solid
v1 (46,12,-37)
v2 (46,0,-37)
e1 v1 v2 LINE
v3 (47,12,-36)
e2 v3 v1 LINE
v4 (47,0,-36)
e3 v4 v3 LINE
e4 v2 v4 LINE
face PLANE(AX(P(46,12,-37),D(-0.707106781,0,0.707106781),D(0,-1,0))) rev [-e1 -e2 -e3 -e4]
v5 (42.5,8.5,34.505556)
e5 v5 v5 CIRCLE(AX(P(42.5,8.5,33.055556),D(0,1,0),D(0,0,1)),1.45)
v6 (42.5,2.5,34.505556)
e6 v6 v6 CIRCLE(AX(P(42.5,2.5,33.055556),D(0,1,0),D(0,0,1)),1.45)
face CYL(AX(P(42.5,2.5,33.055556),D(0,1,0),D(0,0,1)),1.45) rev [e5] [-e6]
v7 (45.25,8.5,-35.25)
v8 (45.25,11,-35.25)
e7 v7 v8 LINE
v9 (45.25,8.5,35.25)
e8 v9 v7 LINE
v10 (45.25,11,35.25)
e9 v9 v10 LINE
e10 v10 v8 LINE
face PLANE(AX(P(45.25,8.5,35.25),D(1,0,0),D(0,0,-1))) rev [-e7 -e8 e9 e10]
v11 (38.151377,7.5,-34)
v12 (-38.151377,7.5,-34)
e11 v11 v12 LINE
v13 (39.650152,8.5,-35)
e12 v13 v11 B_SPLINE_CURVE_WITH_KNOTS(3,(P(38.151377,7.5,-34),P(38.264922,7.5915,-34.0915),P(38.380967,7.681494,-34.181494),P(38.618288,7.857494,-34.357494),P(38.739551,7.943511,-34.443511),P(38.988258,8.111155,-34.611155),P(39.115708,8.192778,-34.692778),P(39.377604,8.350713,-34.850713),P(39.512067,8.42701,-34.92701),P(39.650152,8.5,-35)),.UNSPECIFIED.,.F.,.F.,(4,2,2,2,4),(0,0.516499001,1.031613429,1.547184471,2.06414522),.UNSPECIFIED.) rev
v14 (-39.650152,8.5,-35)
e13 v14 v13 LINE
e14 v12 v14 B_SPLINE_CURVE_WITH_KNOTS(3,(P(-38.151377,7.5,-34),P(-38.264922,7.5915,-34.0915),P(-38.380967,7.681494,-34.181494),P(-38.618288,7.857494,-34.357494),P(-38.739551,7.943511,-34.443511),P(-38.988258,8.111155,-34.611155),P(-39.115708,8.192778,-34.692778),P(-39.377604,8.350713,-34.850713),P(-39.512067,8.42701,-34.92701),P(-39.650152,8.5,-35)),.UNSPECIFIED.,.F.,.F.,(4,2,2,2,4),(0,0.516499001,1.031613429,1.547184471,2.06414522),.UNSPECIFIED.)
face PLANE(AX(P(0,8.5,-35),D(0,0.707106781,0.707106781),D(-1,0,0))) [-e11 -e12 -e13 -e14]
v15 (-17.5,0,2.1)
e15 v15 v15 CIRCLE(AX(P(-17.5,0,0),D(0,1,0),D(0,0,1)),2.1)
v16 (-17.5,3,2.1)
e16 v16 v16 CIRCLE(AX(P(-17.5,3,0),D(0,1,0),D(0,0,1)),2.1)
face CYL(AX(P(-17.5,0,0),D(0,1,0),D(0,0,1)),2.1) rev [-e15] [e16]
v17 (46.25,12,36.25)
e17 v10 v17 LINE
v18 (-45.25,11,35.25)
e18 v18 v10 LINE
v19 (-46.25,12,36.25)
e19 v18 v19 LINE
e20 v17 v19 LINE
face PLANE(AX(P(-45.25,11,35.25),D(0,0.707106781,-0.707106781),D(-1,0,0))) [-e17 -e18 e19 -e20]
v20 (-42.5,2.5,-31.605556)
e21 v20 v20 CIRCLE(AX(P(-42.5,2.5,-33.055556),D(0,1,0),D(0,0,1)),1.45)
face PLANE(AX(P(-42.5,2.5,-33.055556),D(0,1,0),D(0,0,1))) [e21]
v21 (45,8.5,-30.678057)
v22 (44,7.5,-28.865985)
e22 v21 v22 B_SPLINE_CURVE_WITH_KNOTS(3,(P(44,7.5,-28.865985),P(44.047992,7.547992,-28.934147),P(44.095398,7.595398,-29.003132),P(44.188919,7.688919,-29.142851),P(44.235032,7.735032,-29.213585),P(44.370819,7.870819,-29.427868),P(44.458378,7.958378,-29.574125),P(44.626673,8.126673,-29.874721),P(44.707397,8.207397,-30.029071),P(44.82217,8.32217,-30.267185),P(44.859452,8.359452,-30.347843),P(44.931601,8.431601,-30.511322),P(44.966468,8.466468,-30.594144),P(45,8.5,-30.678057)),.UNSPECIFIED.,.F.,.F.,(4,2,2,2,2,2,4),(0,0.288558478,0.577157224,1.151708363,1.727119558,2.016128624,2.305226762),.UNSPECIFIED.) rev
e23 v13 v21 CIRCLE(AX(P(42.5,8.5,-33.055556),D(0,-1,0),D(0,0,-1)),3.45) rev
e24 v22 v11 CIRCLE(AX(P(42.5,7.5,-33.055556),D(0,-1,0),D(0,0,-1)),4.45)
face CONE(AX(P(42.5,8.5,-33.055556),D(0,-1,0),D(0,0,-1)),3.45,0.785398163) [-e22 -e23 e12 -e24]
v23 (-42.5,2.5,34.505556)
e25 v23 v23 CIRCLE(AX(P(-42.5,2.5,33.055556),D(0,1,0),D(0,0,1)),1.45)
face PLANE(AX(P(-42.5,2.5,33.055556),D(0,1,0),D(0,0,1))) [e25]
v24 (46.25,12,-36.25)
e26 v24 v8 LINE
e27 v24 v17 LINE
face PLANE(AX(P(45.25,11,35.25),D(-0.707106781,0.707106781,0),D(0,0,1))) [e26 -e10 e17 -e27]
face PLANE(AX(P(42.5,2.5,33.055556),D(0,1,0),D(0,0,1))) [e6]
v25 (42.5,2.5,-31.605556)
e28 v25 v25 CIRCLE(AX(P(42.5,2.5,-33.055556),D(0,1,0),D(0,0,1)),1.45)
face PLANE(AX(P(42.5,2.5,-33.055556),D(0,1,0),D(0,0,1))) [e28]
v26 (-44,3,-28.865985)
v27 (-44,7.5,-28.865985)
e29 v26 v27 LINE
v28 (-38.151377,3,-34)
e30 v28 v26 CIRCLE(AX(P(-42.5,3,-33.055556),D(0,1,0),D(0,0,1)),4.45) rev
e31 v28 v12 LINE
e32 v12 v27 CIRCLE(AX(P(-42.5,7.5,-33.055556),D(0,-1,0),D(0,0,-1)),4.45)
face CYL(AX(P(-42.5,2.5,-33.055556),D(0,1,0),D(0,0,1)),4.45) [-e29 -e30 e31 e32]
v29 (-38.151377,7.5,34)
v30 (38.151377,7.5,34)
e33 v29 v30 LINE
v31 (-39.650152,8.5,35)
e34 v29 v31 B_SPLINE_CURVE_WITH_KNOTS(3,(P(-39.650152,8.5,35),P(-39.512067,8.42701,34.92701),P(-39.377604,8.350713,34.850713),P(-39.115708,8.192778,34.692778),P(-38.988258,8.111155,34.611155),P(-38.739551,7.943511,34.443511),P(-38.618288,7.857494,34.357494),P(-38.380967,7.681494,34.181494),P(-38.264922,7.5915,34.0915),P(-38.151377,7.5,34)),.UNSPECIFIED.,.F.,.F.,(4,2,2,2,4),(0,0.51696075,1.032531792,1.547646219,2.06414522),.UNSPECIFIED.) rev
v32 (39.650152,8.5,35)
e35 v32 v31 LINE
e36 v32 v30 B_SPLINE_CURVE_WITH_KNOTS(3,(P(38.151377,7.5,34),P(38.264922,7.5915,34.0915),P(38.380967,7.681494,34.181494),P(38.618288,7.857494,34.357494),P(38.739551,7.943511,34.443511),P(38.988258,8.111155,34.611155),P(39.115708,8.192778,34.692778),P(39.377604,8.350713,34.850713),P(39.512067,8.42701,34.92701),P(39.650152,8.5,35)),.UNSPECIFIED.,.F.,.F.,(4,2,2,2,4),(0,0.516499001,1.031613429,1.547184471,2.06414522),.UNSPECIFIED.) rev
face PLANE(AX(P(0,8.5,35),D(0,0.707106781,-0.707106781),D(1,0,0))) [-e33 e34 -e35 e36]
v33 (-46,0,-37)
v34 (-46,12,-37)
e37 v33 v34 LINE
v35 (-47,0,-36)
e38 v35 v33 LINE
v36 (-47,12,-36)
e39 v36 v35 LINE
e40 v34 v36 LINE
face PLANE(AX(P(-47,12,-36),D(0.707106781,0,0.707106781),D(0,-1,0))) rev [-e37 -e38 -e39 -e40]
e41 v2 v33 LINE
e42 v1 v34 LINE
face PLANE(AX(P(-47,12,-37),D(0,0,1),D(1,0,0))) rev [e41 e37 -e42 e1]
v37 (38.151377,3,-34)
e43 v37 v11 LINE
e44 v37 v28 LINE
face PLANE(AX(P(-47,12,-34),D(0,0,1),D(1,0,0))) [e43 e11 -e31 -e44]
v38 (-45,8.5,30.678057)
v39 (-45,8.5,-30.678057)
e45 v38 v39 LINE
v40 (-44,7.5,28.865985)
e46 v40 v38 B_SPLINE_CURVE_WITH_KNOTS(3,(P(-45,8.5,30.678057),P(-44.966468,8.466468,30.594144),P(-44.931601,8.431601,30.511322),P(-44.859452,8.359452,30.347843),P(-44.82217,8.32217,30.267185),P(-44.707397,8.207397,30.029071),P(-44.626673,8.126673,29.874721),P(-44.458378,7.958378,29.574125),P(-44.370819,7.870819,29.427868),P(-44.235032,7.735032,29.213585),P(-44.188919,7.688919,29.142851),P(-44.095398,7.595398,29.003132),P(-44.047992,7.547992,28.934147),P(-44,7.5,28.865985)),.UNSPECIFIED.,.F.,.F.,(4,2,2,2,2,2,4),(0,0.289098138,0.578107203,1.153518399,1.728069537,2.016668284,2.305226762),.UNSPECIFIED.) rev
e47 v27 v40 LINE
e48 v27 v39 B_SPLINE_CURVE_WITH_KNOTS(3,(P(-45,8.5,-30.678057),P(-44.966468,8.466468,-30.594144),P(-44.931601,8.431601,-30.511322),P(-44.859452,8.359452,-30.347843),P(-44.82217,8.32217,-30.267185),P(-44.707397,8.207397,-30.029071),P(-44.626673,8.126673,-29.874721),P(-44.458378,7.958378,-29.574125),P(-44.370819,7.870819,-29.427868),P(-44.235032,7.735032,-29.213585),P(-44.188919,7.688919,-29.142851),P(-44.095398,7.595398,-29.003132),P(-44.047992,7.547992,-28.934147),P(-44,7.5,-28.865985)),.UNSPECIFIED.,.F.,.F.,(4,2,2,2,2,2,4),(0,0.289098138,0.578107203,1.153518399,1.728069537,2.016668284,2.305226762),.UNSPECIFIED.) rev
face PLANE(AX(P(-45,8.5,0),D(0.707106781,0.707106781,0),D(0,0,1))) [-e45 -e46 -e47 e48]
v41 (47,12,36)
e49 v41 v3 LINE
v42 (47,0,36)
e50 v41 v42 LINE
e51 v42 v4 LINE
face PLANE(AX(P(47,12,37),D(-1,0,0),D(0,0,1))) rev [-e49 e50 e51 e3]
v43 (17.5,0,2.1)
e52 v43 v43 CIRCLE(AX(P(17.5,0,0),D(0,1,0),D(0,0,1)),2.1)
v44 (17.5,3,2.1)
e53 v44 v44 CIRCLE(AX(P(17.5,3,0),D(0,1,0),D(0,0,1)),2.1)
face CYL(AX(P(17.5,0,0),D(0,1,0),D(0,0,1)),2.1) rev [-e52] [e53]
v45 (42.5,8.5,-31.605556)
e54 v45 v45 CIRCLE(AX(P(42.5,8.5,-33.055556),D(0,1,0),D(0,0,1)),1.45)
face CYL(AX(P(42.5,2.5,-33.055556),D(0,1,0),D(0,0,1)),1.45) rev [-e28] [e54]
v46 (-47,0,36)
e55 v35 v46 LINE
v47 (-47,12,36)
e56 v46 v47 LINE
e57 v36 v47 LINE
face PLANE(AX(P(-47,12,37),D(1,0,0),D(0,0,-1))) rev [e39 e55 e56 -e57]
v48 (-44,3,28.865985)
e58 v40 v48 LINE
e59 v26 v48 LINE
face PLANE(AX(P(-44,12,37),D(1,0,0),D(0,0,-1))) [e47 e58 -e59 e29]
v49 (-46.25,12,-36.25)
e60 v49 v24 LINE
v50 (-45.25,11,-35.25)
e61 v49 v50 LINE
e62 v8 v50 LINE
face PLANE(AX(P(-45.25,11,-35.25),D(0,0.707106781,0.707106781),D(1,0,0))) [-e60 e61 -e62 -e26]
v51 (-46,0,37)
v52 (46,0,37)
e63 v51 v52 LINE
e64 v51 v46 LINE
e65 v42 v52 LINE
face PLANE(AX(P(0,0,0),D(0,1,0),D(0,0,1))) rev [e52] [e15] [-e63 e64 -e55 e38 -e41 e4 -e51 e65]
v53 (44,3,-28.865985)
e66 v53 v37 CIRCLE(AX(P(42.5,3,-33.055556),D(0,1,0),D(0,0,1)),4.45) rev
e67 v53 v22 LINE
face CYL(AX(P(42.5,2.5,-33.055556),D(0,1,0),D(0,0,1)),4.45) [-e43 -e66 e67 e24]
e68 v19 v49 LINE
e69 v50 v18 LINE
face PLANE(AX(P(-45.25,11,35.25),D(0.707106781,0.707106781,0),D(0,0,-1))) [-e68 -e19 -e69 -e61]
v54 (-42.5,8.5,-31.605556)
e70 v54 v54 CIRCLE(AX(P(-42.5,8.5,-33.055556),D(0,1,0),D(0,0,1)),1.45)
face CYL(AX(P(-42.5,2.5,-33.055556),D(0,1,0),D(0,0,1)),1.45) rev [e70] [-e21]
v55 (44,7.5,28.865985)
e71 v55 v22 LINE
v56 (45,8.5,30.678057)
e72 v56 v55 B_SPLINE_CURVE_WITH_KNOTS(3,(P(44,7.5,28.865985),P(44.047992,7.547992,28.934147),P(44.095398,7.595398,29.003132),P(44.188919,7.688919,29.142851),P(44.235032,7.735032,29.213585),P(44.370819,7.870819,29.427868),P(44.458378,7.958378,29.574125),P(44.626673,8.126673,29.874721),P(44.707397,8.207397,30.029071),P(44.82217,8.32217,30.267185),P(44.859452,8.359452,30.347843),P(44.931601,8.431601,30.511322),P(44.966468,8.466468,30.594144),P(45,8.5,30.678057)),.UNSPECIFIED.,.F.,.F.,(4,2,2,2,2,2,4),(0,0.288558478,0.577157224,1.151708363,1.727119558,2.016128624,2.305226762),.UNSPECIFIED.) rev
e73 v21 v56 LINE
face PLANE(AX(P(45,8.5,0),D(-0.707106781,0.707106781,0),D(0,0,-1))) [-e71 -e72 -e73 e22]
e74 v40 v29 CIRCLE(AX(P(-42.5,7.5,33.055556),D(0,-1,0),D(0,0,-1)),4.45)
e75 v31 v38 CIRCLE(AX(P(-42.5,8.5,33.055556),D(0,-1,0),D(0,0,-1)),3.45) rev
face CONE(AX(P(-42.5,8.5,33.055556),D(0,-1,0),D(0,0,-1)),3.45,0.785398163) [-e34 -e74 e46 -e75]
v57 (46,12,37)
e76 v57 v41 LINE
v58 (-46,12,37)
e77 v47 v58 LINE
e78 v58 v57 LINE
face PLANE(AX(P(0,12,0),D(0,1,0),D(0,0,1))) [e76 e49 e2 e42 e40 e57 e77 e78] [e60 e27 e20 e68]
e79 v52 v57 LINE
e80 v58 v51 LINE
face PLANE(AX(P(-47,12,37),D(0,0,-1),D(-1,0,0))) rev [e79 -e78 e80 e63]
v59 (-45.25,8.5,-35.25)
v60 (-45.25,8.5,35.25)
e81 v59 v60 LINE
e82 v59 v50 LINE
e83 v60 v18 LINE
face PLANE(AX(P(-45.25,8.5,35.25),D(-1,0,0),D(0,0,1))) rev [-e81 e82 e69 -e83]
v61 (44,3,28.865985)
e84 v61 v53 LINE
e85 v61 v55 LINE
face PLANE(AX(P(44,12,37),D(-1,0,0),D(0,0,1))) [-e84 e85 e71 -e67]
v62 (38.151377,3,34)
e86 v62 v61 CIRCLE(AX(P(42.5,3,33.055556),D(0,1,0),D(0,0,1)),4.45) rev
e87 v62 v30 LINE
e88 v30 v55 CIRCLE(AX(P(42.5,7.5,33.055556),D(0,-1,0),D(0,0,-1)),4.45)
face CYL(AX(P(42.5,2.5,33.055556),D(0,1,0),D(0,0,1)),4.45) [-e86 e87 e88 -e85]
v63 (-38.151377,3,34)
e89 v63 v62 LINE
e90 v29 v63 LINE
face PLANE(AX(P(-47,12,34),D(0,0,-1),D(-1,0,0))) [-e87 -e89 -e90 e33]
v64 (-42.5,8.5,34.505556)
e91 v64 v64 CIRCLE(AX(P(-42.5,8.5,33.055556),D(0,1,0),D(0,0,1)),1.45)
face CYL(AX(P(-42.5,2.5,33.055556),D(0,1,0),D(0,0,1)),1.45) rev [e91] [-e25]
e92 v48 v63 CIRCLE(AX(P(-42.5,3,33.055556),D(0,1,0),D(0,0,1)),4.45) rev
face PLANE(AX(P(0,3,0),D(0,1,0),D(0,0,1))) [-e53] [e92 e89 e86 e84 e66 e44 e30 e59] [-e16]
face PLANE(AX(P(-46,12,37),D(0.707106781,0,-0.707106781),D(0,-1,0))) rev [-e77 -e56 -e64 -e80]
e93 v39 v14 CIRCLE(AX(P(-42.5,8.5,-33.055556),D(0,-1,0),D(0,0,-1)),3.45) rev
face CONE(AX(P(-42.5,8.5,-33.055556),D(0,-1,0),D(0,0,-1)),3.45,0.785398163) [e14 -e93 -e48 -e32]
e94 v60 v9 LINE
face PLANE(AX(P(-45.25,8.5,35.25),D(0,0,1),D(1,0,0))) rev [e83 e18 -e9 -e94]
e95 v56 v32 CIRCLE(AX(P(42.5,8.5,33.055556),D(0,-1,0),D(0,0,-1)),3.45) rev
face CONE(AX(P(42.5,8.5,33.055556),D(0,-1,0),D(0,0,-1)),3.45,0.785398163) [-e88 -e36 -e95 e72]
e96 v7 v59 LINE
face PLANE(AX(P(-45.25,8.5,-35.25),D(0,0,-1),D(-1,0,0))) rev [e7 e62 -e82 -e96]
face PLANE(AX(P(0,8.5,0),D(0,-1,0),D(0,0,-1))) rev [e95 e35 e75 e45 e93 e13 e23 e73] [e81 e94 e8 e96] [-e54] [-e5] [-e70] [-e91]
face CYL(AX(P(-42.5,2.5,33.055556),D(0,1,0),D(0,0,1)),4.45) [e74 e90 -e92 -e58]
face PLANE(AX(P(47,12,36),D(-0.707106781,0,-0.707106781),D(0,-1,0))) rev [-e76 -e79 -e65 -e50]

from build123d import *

# Parameters (mm, degrees)
SKETCH1_W           = 94
SKETCH1_H           = 74
BOSS_EXTRUDE1_DEPTH = 12
SKETCH2_W           = 90.5
SKETCH2_H           = 70.5
CUT_EXTRUDE1_DEPTH  = 3.5
SKETCH3_R           = 1.45
CUT_EXTRUDE2_DEPTH  = 6
SHELL1_START        = 3
SHELL1_DEPTH        = 5.5
CHAMFER1_SIZE       = 1
CHAMFER2_SIZE       = 1
CHAMFER3_SIZE       = 1
SKETCH4_R           = 2.1
CUT_EXTRUDE3_DEPTH  = 61.489668539


# Read off the part's stored shape, not the designer's step: Shell1
with BuildPart() as part:
    # Sketch1 → Boss-Extrude1 (new body)
    with BuildSketch(Plane(origin=(0, 0, 0), x_dir=(1, 0, 0), z_dir=(0, 1, 0))):
        Rectangle(SKETCH1_W, SKETCH1_H)
    extrude(amount=BOSS_EXTRUDE1_DEPTH)

    # Sketch2 → Cut-Extrude1 (cut)
    with BuildSketch(Plane(origin=(0, 12, 0), x_dir=(1, 0, 0), z_dir=(0, 1, 0))):
        Rectangle(SKETCH2_W, SKETCH2_H)
    extrude(amount=-CUT_EXTRUDE1_DEPTH, mode=Mode.SUBTRACT)

    # Sketch3 → Cut-Extrude2 (cut)
    with BuildSketch(Plane(origin=(0, 8.5, 0), x_dir=(1, 0, 0), z_dir=(0, 1, 0))):
        with Locations(Location((-42.5, 33.055555556, 0), (0, 0, 270))):
            Circle(SKETCH3_R)
        with Locations(Location((42.5, 33.055555556, 0), (0, 0, 270))):
            Circle(SKETCH3_R)
        with Locations(Location((42.5, -33.055555556, 0), (0, 0, 270))):
            Circle(SKETCH3_R)
        with Locations(Location((-42.5, -33.055555556, 0), (0, 0, 270))):
            Circle(SKETCH3_R)
    extrude(amount=-CUT_EXTRUDE2_DEPTH, mode=Mode.SUBTRACT)

    # Shell1 outline → Shell1 (cut)
    with BuildSketch(Plane(origin=(0, 0, 0), x_dir=(1, 0, 0), z_dir=(0, 1, 0)).offset(SHELL1_START)):
        with BuildLine():
            Line((-38.15137669, -34), (38.15137669, -34))
            ThreePointArc((38.15137669, -34), (39.564324481, -29.711260526), (44, -28.865985172))
            Line((44, -28.865985172), (44, 28.865985172))
            ThreePointArc((44, 28.865985172), (39.564324481, 29.711260526), (38.15137669, 34))
            Line((38.15137669, 34), (-38.15137669, 34))
            ThreePointArc((-38.15137669, 34), (-39.564324481, 29.711260526), (-44, 28.865985172))
            Line((-44, 28.865985172), (-44, -28.865985172))
            ThreePointArc((-44, -28.865985172), (-39.564324481, -29.711260526), (-38.15137669, -34))
        make_face()
    extrude(amount=SHELL1_DEPTH, mode=Mode.SUBTRACT)

    # Chamfer1
    chamfer1_edges = [part.edges().sort_by_distance(p)[0] for p in [
        (45.25, 12, 0),
        (0, 12, -35.25),
        (-45.25, 12, 0),
        (0, 12, 35.25),
    ]]
    chamfer(chamfer1_edges, length=CHAMFER1_SIZE)

    # Chamfer2
    chamfer2_edges = [part.edges().sort_by_distance(p)[0] for p in [
        (0, 8.5, 34),
        (44, 8.5, 0),
        (0, 8.5, -34),
        (-44, 8.5, 0),
        (-39.564324481, 8.5, -29.711260526),
        (39.564324481, 8.5, -29.711260526),
        (39.564324481, 8.5, 29.711260526),
        (-39.564324481, 8.5, 29.711260526),
    ]]
    chamfer(chamfer2_edges, length=CHAMFER2_SIZE)

    # Chamfer3
    chamfer3_edges = [part.edges().sort_by_distance(p)[0] for p in [
        (-47, 6, 37),
        (-47, 6, -37),
        (47, 6, -37),
        (47, 6, 37),
    ]]
    chamfer(chamfer3_edges, length=CHAMFER3_SIZE)

    # Sketch4 → Cut-Extrude3 (cut, through all)
    with BuildSketch(Plane(origin=(0, 3, 0), x_dir=(1, 0, 0), z_dir=(0, 1, 0))):
        with Locations(Location((-17.5, 0, 0), (0, 0, 270))):
            Circle(SKETCH4_R)
        with Locations(Location((17.5, 0, 0), (0, 0, 270))):
            Circle(SKETCH4_R)
    extrude(amount=-CUT_EXTRUDE3_DEPTH, mode=Mode.SUBTRACT)


solid = part.part
